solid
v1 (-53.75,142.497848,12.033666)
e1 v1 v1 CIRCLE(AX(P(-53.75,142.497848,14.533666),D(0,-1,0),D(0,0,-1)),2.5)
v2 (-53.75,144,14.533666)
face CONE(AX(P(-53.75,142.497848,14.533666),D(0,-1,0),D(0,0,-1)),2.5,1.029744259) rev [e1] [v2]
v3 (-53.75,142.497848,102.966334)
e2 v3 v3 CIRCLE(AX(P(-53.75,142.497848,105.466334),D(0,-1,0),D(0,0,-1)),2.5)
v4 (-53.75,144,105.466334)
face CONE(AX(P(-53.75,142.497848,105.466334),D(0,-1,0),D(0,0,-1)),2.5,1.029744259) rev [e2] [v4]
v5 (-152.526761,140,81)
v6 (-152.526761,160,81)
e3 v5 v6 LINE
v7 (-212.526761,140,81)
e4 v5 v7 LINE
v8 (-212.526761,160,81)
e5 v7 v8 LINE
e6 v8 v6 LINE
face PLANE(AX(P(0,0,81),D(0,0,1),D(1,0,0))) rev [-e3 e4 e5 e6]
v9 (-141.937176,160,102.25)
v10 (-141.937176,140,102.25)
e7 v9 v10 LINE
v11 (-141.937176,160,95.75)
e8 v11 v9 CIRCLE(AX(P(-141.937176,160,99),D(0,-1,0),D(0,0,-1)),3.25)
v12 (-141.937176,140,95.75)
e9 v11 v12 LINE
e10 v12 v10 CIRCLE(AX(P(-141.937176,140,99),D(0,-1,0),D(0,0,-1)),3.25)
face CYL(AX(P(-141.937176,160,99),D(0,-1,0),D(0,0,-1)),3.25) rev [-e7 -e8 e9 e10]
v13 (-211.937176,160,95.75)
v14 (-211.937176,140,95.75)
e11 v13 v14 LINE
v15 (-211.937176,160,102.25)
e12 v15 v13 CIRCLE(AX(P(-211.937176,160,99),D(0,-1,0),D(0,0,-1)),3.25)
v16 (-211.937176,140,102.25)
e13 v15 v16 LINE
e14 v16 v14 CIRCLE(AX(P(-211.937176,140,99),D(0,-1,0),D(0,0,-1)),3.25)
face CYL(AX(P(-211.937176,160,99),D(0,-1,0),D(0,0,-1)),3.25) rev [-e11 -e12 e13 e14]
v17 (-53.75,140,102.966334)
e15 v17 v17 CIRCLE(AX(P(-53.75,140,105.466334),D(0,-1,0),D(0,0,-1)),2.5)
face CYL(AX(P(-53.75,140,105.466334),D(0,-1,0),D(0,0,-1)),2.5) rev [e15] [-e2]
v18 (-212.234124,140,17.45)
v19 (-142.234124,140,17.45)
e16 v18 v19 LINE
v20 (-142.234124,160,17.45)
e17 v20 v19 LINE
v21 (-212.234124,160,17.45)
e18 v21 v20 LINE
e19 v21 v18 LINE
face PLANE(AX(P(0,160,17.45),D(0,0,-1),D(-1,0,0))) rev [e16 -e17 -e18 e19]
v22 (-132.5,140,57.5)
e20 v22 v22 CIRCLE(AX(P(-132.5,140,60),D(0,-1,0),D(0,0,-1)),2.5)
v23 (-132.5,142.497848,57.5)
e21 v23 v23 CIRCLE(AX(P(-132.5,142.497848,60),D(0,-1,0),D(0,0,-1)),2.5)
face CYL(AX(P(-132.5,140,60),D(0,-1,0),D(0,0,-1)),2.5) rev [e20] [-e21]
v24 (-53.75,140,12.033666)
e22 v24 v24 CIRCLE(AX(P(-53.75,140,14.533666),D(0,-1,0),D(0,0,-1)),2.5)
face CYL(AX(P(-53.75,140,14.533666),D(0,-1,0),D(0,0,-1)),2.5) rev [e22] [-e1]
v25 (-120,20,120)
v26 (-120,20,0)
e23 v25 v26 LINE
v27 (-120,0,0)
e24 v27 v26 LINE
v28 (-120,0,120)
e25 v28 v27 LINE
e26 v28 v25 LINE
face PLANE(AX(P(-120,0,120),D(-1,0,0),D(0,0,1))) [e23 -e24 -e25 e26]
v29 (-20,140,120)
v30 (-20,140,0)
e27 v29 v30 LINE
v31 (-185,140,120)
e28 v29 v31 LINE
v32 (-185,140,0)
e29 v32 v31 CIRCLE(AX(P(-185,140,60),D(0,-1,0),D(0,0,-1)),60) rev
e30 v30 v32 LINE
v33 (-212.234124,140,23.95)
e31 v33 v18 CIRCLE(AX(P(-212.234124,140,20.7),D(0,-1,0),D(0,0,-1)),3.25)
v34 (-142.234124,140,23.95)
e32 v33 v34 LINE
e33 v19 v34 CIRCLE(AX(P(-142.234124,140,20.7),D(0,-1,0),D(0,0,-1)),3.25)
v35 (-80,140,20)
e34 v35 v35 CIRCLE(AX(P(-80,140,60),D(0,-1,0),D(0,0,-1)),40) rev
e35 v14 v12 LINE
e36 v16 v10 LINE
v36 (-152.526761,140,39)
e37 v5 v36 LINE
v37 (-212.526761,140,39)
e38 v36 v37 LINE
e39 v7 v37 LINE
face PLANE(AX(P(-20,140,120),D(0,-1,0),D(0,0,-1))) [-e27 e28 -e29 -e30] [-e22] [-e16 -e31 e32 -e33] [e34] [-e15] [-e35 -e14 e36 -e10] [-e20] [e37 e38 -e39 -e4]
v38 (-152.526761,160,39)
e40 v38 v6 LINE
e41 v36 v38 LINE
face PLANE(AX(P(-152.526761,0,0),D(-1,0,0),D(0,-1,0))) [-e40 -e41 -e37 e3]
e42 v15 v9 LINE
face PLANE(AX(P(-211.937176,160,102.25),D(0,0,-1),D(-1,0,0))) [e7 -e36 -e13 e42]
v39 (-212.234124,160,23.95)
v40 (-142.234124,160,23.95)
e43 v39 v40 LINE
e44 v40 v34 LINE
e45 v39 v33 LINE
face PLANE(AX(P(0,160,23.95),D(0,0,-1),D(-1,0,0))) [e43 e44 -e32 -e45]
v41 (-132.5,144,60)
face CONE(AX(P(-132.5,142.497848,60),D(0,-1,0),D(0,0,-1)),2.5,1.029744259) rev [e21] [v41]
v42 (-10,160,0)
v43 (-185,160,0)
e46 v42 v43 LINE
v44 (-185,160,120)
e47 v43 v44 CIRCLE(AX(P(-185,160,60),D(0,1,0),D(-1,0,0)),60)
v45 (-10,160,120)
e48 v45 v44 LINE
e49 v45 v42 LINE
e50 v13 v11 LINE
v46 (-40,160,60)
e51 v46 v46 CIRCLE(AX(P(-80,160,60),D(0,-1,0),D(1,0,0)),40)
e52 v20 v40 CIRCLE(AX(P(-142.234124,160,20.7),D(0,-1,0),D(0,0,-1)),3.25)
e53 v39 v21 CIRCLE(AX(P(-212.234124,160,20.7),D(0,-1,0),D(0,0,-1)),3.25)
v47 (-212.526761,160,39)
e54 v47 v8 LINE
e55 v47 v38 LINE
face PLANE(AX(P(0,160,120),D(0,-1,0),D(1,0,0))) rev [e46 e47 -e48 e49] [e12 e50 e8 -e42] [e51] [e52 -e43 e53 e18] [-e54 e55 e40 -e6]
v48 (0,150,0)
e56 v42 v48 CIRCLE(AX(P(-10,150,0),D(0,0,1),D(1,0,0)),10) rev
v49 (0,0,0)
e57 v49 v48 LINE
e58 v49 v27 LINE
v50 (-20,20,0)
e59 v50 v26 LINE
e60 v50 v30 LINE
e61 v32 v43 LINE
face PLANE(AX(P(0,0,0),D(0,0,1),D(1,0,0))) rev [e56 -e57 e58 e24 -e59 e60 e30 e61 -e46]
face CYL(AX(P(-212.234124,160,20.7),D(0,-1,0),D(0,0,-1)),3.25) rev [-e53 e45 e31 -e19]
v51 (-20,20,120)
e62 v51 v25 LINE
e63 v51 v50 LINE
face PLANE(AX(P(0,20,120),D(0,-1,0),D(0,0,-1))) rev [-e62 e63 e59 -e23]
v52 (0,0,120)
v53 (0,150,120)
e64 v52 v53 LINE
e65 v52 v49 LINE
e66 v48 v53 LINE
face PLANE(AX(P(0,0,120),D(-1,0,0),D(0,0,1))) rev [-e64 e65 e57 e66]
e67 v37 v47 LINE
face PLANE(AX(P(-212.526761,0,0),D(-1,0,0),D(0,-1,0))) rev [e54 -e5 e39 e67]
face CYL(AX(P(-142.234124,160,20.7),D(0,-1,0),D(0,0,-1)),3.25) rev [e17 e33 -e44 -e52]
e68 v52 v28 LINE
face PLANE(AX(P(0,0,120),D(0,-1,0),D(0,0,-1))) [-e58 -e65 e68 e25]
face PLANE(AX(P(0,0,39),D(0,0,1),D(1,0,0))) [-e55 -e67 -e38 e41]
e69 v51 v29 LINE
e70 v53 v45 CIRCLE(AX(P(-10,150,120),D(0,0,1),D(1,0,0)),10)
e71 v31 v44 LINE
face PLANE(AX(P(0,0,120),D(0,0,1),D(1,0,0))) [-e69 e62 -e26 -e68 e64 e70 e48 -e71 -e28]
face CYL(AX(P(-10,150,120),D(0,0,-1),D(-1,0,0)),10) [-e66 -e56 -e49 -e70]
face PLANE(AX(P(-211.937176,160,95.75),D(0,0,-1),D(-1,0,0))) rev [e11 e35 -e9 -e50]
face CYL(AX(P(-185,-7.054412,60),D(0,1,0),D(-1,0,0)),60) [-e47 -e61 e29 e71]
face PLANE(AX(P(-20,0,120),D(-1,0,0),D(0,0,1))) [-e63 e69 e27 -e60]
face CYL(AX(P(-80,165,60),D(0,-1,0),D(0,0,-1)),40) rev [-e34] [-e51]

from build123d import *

# Parameters (mm, degrees)
SKETCH4_W                    = 20
SKETCH4_H                    = 120
SKETCH4_W_2                  = 120
SKETCH4_H_2                  = 20
SKETCH4_W_3                  = 160
BOSS_EXTRUDE3_DEPTH          = 120
BOSS_EXTRUDE4_DEPTH          = 20
SKETCH21_R                   = 40
CUT_EXTRUDE3_DEPTH           = 25
SKETCH24_W                   = 15
SKETCH24_H                   = 20
SPLIT1_START                 = 97.450277265
SPLIT1_OUTLINE_R             = 45
SPLIT1_OUTLINE_R_2           = 25.75
SPLIT1_DEPTH                 = 42.549722735
SPLIT1_2_DEPTH               = 42.549722735
SPLIT1_3_OUTLINE_R           = 25.75
SPLIT1_3_DEPTH               = 6
SPLIT1_START_2               = 103.450277265
SPLIT1_4_DEPTH               = 8.549722735
SPLIT1_START_3               = 132
SPLIT1_5_DEPTH               = 8
F_5_0_5_DIAMETER_HOLE1_D     = 5
F_5_0_5_DIAMETER_HOLE1_DEPTH = 2.497848452
F_5_0_5_DIAMETER_HOLE1_TIP   = 1.502151548
CUT_EXTRUDE4_DEPTH           = 317.267292017
CUT_EXTRUDE5_DEPTH           = 307.634962129
CUT_EXTRUDE5_DEPTH_BACK      = 307.634962129
FILLET1_R                    = 10


# Read off the part's stored shape, not the designer's step: Split1
with BuildPart() as part:
    # Sketch4 → Boss-Extrude3 (new body)
    with BuildSketch(Plane.XY):
        with Locations((-10, 80)):
            Rectangle(SKETCH4_W, SKETCH4_H)
        with Locations((-60, 10)):
            Rectangle(SKETCH4_W_2, SKETCH4_H_2)
        with Locations((-80, 150)):
            Rectangle(SKETCH4_W_3, SKETCH4_H_2)
    extrude(amount=BOSS_EXTRUDE3_DEPTH)

    # Sketch20 → Boss-Extrude4 (add)
    with BuildSketch(Plane(origin=(0, 160, 0), x_dir=(1, 0, 0), z_dir=(0, 1, 0))):
        with BuildLine():
            Line((-185, -120), (-160, -120))
            Line((-160, -120), (-160, 0))
            Line((-160, 0), (-185, 0))
            ThreePointArc((-185, 0), (-245, -60), (-185, -120))
        make_face()
    extrude(amount=-BOSS_EXTRUDE4_DEPTH)

    # Sketch21 → Cut-Extrude3 (cut)
    with BuildSketch(Plane.XZ.offset(-140)):
        with Locations(Location((-80, 60, 0), (0, 0, 270))):
            Circle(SKETCH21_R)
    extrude(amount=-CUT_EXTRUDE3_DEPTH, mode=Mode.SUBTRACT)

    # Sketch23 → Revolve1 (revolve)
    with BuildSketch(Plane(origin=(0, 0, 60), x_dir=(-1, 0, 0), z_dir=(0, 0, -1)), mode=Mode.PRIVATE) as revolve1_sk:
        Polygon((125, 140), (120, 140), (120, 103.450277265), (105.75, 103.450277265), (105.75, 97.450277265), (125, 97.450277265), align=None)
    revolve(revolve1_sk.sketch.rotate(Axis((-80, 160, 60), (0, -1, 0)), 270), axis=Axis((-80, 160, 60), (0, -1, 0)))

    # Cut-Sweep1: sweep along a path in Sketch25
    with BuildLine(Plane(origin=(0, 132, 0), x_dir=(-1, 0, 0), z_dir=(0, -1, 0))) as cut_sweep1_path:
        Line((125, -80.343984431), (80, -90))
        ThreePointArc((80, -90), (50, -60), (80, -30))
        Line((80, -30), (125, -39.656015569))
    # Sketch24 → Cut-Sweep1 (sweep, cut)
    with BuildSketch(Plane.ZY.offset(125)):
        with Locations((37.5, 122)):
            Rectangle(SKETCH24_W, SKETCH24_H)
    sweep(path=cut_sweep1_path.line, transition=Transition.RIGHT, mode=Mode.SUBTRACT)

    # Split1 outline → Split1 (cut)
    with BuildSketch(Plane(origin=(0, 0, 0), x_dir=(1, 0, 0), z_dir=(0, 1, 0)).offset(SPLIT1_START)):
        with Locations((-80, -60)):
            Circle(SPLIT1_OUTLINE_R)
        with Locations((-80, -60)):
            Circle(SPLIT1_OUTLINE_R_2, mode=Mode.SUBTRACT)
    extrude(amount=SPLIT1_DEPTH, mode=Mode.SUBTRACT)

    # Ø5.0 (5) Diameter Hole1
    with Locations(Plane(origin=(0, 140, 0), x_dir=(-1, 0, 0), z_dir=(0, -1, 0))):
        with Locations((53.75, -14.533666301), (132.5, -60), (53.75, -105.466333699)):
            Hole(F_5_0_5_DIAMETER_HOLE1_D / 2, depth=F_5_0_5_DIAMETER_HOLE1_DEPTH)
            with Locations((0, 0, -(F_5_0_5_DIAMETER_HOLE1_DEPTH + F_5_0_5_DIAMETER_HOLE1_TIP / 2))):  # 118° drill point
                Cone(0, F_5_0_5_DIAMETER_HOLE1_D / 2, F_5_0_5_DIAMETER_HOLE1_TIP, mode=Mode.SUBTRACT)

    # Sketch19 → Cut-Extrude4 (cut, through all)
    with BuildSketch(Plane(origin=(0, 160, 0), x_dir=(1, 0, 0), z_dir=(0, 1, 0))):
        Polygon((-152.526760948, -69.999980109), (-152.526760948, -81), (-212.526760948, -81), (-212.526760948, -39), (-152.526760948, -39), (-152.526760948, -50.000019891), align=None)
    extrude(amount=-CUT_EXTRUDE4_DEPTH, mode=Mode.SUBTRACT)

    # Sketch30 → Cut-Extrude5 (cut, two sides: drawn at the far end of the back side and taken through both)
    with BuildSketch(Plane.XZ.offset(-140).offset(-CUT_EXTRUDE5_DEPTH_BACK)):
        with BuildLine():
            Line((-212.234124069, 23.95), (-142.234124069, 23.95))
            ThreePointArc((-142.234124069, 23.95), (-138.984124069, 20.7), (-142.234124069, 17.45))
            Line((-142.234124069, 17.45), (-212.234124069, 17.45))
            ThreePointArc((-212.234124069, 17.45), (-215.484124069, 20.7), (-212.234124069, 23.95))
        make_face()
        with BuildLine():
            Line((-211.937175822, 102.25), (-141.937175822, 102.25))
            ThreePointArc((-141.937175822, 102.25), (-138.687175822, 99), (-141.937175822, 95.75))
            Line((-141.937175822, 95.75), (-211.937175822, 95.75))
            ThreePointArc((-211.937175822, 95.75), (-215.187175822, 99), (-211.937175822, 102.25))
        make_face()
    extrude(amount=CUT_EXTRUDE5_DEPTH + CUT_EXTRUDE5_DEPTH_BACK, mode=Mode.SUBTRACT)

    # Fillet1
    fillet1_edges = [part.edges().sort_by_distance(p)[0] for p in [
        (0, 160, 60),
    ]]
    fillet(fillet1_edges, radius=FILLET1_R)


with BuildPart() as body_2:
    # Split1 2 outline → Split1 2 (new body)
    with BuildSketch(Plane(origin=(0, 0, 0), x_dir=(1, 0, 0), z_dir=(0, 1, 0)).offset(SPLIT1_START)):
        with BuildLine():
            ThreePointArc((-97.74561888, -24.151806035), (-40, -60), (-97.74561888, -95.848193965))
            Line((-97.74561888, -95.848193965), (-110.465485891, -93.118788767))
            ThreePointArc((-110.465485891, -93.118788767), (-35, -60), (-110.465485891, -26.881211233))
            Line((-110.465485891, -26.881211233), (-97.74561888, -24.151806035))
        make_face()
        with BuildLine():
            ThreePointArc((-116.266630075, -76.873990133), (-120, -60), (-116.266630075, -43.126009867))
            Line((-116.266630075, -43.126009867), (-122.209965285, -44.401319586))
            ThreePointArc((-122.209965285, -44.401319586), (-125, -60), (-122.209965285, -75.598680414))
            Line((-122.209965285, -75.598680414), (-116.266630075, -76.873990133))
        make_face()
    extrude(amount=SPLIT1_2_DEPTH)

    # Split1 3 outline → Split1 3 (add)
    with BuildSketch(Plane(origin=(0, 0, 0), x_dir=(1, 0, 0), z_dir=(0, 1, 0)).offset(SPLIT1_START)):
        with BuildLine():
            ThreePointArc((-97.74561888, -95.848193965), (-40, -60), (-97.74561888, -24.151806035))
            Line((-97.74561888, -24.151806035), (-110.465485891, -26.881211233))
            ThreePointArc((-110.465485891, -26.881211233), (-117.378721889, -34.94344098), (-122.209965285, -44.401319586))
            Line((-122.209965285, -44.401319586), (-116.266630075, -43.126009867))
            ThreePointArc((-116.266630075, -43.126009867), (-120, -60), (-116.266630075, -76.873990133))
            Line((-116.266630075, -76.873990133), (-122.209965285, -75.598680414))
            ThreePointArc((-122.209965285, -75.598680414), (-117.378721889, -85.05655902), (-110.465485891, -93.118788767))
            Line((-110.465485891, -93.118788767), (-97.74561888, -95.848193965))
        make_face()
        with Locations((-80, -60)):
            Circle(SPLIT1_3_OUTLINE_R, mode=Mode.SUBTRACT)
    extrude(amount=SPLIT1_3_DEPTH)

    # Split1 4 outline → Split1 4 (add)
    with BuildSketch(Plane(origin=(0, 0, 0), x_dir=(1, 0, 0), z_dir=(0, 1, 0)).offset(SPLIT1_START_2)):
        with BuildLine():
            ThreePointArc((-116.266630075, -43.126009867), (-108.624043426, -32.059632466), (-97.74561888, -24.151806035))
            Line((-97.74561888, -24.151806035), (-110.465485891, -26.881211233))
            ThreePointArc((-110.465485891, -26.881211233), (-117.378721889, -34.94344098), (-122.209965285, -44.401319586))
            Line((-122.209965285, -44.401319586), (-116.266630075, -43.126009867))
        make_face()
        with BuildLine():
            Line((-110.465485891, -93.118788767), (-97.74561888, -95.848193965))
            ThreePointArc((-97.74561888, -95.848193965), (-108.624043426, -87.940367534), (-116.266630075, -76.873990133))
            Line((-116.266630075, -76.873990133), (-122.209965285, -75.598680414))
            ThreePointArc((-122.209965285, -75.598680414), (-117.378721889, -85.05655902), (-110.465485891, -93.118788767))
        make_face()
    extrude(amount=SPLIT1_4_DEPTH)

    # Split1 5 outline → Split1 5 (add)
    with BuildSketch(Plane(origin=(0, 0, 0), x_dir=(1, 0, 0), z_dir=(0, 1, 0)).offset(SPLIT1_START_3)):
        with BuildLine():
            ThreePointArc((-116.266630075, -43.126009867), (-108.624043426, -32.059632466), (-97.74561888, -24.151806035))
            Line((-97.74561888, -24.151806035), (-110.465485891, -26.881211233))
            ThreePointArc((-110.465485891, -26.881211233), (-117.378721889, -34.94344098), (-122.209965285, -44.401319586))
            Line((-122.209965285, -44.401319586), (-116.266630075, -43.126009867))
        make_face()
        with BuildLine():
            Line((-110.465485891, -93.118788767), (-97.74561888, -95.848193965))
            ThreePointArc((-97.74561888, -95.848193965), (-108.624043426, -87.940367534), (-116.266630075, -76.873990133))
            Line((-116.266630075, -76.873990133), (-122.209965285, -75.598680414))
            ThreePointArc((-122.209965285, -75.598680414), (-117.378721889, -85.05655902), (-110.465485891, -93.118788767))
        make_face()
    extrude(amount=SPLIT1_5_DEPTH)


solid = part.part
